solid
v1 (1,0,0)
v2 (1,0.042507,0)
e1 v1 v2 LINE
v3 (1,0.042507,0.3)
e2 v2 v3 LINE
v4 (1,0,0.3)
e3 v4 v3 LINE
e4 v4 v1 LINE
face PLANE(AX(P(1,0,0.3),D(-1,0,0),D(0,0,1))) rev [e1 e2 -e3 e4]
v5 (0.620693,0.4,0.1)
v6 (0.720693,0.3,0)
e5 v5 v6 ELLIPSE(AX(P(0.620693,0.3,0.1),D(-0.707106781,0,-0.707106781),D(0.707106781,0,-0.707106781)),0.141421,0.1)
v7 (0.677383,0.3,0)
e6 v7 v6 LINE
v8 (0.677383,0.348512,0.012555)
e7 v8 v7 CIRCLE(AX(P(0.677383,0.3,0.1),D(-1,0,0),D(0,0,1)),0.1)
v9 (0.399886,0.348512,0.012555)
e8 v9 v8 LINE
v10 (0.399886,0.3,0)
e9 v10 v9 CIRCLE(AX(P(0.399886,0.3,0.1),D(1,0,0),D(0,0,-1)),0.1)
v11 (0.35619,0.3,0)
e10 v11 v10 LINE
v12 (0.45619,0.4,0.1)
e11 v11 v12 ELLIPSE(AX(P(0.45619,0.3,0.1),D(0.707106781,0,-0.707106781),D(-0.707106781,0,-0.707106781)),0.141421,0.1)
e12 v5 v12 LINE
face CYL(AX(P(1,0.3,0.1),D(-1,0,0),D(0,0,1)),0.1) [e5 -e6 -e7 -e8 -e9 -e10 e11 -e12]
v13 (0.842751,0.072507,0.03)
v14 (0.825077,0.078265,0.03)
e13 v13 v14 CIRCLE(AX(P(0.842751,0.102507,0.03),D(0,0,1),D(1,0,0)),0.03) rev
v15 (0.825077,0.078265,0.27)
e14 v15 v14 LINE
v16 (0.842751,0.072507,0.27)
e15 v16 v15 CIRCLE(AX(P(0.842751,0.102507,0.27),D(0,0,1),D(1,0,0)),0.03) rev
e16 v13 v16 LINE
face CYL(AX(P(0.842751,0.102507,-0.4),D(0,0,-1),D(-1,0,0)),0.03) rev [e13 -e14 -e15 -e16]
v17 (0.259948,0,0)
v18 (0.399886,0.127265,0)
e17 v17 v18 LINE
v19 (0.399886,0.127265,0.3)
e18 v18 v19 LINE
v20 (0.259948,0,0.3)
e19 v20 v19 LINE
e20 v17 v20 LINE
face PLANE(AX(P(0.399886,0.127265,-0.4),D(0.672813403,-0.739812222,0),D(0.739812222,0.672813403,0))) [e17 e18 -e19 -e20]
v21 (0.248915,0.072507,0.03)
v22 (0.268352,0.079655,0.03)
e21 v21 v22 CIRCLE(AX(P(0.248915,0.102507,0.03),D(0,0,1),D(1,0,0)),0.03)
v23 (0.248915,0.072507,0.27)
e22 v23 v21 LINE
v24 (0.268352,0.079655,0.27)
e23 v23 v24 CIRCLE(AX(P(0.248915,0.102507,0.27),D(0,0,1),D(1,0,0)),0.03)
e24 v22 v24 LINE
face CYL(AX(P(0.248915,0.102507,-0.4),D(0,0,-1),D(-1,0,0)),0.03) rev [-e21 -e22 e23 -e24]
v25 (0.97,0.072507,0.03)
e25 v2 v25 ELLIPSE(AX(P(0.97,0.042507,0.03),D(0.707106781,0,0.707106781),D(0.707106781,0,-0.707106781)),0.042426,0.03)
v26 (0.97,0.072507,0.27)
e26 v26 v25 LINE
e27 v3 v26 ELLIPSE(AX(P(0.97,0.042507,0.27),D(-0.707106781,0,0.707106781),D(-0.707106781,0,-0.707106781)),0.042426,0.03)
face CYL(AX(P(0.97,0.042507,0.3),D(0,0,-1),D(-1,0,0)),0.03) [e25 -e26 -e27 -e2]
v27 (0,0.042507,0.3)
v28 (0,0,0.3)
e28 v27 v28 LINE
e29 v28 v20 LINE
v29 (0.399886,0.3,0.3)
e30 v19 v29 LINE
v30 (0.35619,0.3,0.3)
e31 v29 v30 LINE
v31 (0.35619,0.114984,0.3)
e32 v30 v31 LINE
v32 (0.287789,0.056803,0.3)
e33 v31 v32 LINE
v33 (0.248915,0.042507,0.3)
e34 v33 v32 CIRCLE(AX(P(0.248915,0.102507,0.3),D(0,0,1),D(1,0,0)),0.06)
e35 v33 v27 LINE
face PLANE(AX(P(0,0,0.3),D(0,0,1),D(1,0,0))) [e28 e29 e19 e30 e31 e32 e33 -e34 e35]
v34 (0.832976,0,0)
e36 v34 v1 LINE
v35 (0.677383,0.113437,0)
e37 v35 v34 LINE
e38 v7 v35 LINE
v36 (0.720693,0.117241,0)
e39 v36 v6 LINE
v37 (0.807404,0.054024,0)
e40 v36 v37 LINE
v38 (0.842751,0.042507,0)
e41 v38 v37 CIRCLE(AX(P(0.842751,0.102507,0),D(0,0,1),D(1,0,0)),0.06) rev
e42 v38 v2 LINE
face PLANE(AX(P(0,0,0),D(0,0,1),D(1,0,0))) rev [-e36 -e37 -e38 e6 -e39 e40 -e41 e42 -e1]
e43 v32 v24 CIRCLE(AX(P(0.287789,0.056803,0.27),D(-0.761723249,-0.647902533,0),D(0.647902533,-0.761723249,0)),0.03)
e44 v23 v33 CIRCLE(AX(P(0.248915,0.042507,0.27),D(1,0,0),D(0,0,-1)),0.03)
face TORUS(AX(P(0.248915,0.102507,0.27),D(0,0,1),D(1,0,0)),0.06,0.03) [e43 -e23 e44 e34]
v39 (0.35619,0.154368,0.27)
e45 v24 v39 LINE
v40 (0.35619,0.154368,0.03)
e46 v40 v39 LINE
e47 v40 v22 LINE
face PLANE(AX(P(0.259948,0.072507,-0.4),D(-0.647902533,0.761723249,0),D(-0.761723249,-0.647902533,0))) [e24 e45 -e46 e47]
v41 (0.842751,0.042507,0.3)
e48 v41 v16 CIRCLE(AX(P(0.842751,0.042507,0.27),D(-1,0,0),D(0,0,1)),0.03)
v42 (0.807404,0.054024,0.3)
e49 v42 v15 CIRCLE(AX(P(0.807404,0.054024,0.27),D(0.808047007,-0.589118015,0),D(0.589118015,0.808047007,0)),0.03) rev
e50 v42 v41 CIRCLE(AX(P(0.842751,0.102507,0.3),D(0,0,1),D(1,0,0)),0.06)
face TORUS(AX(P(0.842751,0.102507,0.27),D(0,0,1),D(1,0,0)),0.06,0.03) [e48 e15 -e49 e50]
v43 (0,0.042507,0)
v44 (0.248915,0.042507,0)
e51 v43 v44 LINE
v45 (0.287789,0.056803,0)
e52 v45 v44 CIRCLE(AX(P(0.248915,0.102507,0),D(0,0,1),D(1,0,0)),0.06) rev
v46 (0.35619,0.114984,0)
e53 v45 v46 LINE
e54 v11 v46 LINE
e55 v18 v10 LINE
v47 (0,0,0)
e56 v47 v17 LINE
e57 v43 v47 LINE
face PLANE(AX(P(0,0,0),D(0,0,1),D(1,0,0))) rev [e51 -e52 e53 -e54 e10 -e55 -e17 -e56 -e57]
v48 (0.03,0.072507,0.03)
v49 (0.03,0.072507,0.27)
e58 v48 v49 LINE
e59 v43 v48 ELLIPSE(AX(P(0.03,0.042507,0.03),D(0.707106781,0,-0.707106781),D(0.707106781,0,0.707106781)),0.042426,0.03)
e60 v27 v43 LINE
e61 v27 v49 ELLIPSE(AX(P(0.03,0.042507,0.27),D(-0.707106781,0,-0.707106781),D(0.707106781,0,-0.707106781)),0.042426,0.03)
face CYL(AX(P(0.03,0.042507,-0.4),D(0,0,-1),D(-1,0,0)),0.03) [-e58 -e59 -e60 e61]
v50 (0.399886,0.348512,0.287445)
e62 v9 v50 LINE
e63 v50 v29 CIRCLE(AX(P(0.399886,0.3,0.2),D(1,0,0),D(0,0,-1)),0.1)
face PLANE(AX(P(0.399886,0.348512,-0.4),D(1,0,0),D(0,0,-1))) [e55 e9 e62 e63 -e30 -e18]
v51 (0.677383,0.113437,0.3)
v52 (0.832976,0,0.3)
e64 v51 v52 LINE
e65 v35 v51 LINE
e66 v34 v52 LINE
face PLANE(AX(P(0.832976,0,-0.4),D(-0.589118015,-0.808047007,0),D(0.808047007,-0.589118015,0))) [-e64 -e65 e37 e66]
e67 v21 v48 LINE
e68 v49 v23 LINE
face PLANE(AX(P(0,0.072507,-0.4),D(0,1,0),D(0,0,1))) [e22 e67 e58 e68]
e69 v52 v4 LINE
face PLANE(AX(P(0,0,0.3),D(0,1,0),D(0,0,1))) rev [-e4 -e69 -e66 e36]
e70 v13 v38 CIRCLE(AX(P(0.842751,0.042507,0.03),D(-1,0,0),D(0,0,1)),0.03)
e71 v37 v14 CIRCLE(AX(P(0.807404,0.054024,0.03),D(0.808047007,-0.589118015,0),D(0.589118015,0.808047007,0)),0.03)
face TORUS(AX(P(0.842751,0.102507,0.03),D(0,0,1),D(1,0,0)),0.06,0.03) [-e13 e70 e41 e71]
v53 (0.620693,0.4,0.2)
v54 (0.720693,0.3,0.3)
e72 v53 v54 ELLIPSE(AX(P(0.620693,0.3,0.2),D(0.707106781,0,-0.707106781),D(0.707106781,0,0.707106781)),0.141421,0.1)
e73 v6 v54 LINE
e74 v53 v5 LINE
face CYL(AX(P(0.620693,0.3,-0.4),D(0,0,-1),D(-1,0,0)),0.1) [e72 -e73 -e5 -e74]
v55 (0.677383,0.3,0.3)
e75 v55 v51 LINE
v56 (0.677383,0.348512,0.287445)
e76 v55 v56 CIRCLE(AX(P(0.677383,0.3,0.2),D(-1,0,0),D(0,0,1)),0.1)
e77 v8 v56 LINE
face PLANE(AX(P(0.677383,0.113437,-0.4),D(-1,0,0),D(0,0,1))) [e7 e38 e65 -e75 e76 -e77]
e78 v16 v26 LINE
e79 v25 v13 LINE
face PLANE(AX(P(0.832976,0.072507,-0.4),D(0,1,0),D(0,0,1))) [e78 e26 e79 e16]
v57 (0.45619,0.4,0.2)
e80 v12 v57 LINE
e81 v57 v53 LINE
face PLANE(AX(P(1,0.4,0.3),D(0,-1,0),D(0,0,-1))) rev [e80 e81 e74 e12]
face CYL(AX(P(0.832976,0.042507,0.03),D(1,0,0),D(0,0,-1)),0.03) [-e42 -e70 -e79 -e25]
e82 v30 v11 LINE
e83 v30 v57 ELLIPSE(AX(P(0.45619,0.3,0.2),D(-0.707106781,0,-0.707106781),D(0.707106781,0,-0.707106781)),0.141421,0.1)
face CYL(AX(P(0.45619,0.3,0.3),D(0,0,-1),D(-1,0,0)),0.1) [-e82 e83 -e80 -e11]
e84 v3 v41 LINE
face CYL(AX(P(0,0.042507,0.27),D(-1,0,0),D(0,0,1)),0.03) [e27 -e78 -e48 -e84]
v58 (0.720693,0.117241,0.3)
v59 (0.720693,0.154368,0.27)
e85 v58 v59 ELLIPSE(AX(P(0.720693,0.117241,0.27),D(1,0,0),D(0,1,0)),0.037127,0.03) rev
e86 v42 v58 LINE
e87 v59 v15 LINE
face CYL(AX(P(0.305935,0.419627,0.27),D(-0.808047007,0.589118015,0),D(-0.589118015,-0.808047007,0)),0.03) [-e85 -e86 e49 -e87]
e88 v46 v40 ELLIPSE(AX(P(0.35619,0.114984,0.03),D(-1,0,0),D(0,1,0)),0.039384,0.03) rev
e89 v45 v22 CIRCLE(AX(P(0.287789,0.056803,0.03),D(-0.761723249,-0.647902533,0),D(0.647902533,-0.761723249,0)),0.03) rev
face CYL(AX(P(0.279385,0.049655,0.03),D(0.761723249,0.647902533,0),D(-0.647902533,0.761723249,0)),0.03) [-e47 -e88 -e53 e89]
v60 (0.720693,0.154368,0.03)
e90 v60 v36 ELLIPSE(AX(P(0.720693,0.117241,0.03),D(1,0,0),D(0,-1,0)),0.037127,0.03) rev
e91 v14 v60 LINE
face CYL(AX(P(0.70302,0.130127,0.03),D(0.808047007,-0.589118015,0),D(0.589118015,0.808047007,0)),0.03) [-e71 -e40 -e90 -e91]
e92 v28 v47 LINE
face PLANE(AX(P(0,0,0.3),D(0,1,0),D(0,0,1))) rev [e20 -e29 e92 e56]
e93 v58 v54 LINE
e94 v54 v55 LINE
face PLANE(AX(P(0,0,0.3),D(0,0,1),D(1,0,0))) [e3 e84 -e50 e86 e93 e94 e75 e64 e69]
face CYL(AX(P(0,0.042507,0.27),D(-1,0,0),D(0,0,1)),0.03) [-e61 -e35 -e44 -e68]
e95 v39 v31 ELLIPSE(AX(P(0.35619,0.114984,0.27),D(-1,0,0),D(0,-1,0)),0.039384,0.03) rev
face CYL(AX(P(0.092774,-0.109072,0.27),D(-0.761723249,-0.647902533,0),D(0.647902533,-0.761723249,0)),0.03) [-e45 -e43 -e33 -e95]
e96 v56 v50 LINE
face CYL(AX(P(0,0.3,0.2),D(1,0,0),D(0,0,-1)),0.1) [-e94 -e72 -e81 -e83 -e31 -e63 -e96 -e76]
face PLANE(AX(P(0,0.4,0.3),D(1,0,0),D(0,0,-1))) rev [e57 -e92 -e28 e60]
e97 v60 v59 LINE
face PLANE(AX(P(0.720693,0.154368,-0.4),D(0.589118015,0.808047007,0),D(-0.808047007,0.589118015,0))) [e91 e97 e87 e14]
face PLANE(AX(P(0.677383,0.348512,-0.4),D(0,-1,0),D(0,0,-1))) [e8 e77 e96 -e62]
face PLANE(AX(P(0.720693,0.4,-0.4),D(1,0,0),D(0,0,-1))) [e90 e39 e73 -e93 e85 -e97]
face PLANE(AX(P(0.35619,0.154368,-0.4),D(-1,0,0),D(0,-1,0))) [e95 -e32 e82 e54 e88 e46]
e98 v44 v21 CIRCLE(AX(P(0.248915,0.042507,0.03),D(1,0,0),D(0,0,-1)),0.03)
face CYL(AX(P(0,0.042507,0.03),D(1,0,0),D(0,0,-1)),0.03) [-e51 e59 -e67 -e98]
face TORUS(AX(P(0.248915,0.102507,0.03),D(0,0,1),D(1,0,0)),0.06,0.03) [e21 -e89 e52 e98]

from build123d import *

# Parameters (mm, degrees)
SKETCH_1_W          = 1
SKETCH_1_H          = 0.4
EXTRUDE_1_DEPTH     = 0.3
SKETCH_2_OUTSIDE_W  = 3.224
SKETCH_2_OUTSIDE_H  = 2.624
CUT_EXTRUDE_1_DEPTH = 0.7
FILLET_1_R          = 0.1
FILLET_2_R          = 0.03


with BuildPart() as part:
    # 草图1 → 凸台-拉伸1 (new body)
    with BuildSketch(Plane.XY):
        with Locations((0.5, 0.2)):
            Rectangle(SKETCH_1_W, SKETCH_1_H)
    extrude(amount=EXTRUDE_1_DEPTH)

    # 草图2 outside → 切除-拉伸1 (cut)
    with BuildSketch(Plane.XY.offset(0.3)):
        with Locations((0.5, 0.2)):
            Rectangle(SKETCH_2_OUTSIDE_W, SKETCH_2_OUTSIDE_H)
        Polygon((0, 0.072506772), (0.259947675, 0.072506772), (0.356189851, 0.154367934), (0.356189851, 0.4), (0.720693267, 0.4), (0.720693267, 0.154367934), (0.832975806, 0.072506772), (1, 0.072506772), (1, 0), (0.832975806, 0), (0.67738268, 0.113437353), (0.67738268, 0.348511634), (0.399886012, 0.348511634), (0.399886012, 0.127265252), (0.259947675, 0), (0, 0), align=None, mode=Mode.SUBTRACT)
    extrude(amount=-CUT_EXTRUDE_1_DEPTH, mode=Mode.SUBTRACT)

    # 圆角1
    # the kernel refuses this fillet: 0.1 mm, written as the material it takes off along each edge
    with BuildSketch(Plane(origin=(0.970693267, 0.4, 0), x_dir=(0, -1, 0), z_dir=(-1, 0, 0)), Plane(origin=(0.106189851, 0.4, 0.3), x_dir=(0, -1, 0), z_dir=(1, 0, 0))) as fillet_1_piece_1:
        with BuildLine():
            CenterArc((FILLET_1_R, FILLET_1_R), FILLET_1_R, 180, 90)
            Line((0, FILLET_1_R), (0, 0))
            Line((0, 0), (FILLET_1_R, 0))
        make_face()
    extrude(amount=0.864503415, mode=Mode.SUBTRACT)
    with BuildSketch(Plane(origin=(0.720693267, 0.4, 0.55), x_dir=(-1, 0, 0), z_dir=(0, 0, -1)), Plane(origin=(0.356189851, 0.4, 0.55), x_dir=(0, -1, 0), z_dir=(0, 0, -1))) as fillet_1_piece_2:
        with BuildLine():
            CenterArc((FILLET_1_R, -FILLET_1_R), FILLET_1_R, 90, 90)
            Line((0, -FILLET_1_R), (0, 0))
            Line((0, 0), (FILLET_1_R, 0))
        make_face()
    extrude(amount=0.8, mode=Mode.SUBTRACT)

    # 圆角2
    fillet_2_edges = [part.edges().sort_by_distance(p)[0] for p in [
        (0.916487903, 0.072506772, 0),
        (0.776834536, 0.113437353, 0),
        (0.308068763, 0.113437353, 0),
        (0.129973837, 0.072506772, 0),
        (0, 0.072506772, 0.15),
        (0.259947675, 0.072506772, 0.15),
        (0.129973837, 0.072506772, 0.3),
        (0.308068763, 0.113437353, 0.3),
        (0.832975806, 0.072506772, 0.15),
        (0.776834536, 0.113437353, 0.3),
        (1, 0.072506772, 0.15),
        (0.916487903, 0.072506772, 0.3),
    ]]
    fillet(fillet_2_edges, radius=FILLET_2_R)


solid = part.part
